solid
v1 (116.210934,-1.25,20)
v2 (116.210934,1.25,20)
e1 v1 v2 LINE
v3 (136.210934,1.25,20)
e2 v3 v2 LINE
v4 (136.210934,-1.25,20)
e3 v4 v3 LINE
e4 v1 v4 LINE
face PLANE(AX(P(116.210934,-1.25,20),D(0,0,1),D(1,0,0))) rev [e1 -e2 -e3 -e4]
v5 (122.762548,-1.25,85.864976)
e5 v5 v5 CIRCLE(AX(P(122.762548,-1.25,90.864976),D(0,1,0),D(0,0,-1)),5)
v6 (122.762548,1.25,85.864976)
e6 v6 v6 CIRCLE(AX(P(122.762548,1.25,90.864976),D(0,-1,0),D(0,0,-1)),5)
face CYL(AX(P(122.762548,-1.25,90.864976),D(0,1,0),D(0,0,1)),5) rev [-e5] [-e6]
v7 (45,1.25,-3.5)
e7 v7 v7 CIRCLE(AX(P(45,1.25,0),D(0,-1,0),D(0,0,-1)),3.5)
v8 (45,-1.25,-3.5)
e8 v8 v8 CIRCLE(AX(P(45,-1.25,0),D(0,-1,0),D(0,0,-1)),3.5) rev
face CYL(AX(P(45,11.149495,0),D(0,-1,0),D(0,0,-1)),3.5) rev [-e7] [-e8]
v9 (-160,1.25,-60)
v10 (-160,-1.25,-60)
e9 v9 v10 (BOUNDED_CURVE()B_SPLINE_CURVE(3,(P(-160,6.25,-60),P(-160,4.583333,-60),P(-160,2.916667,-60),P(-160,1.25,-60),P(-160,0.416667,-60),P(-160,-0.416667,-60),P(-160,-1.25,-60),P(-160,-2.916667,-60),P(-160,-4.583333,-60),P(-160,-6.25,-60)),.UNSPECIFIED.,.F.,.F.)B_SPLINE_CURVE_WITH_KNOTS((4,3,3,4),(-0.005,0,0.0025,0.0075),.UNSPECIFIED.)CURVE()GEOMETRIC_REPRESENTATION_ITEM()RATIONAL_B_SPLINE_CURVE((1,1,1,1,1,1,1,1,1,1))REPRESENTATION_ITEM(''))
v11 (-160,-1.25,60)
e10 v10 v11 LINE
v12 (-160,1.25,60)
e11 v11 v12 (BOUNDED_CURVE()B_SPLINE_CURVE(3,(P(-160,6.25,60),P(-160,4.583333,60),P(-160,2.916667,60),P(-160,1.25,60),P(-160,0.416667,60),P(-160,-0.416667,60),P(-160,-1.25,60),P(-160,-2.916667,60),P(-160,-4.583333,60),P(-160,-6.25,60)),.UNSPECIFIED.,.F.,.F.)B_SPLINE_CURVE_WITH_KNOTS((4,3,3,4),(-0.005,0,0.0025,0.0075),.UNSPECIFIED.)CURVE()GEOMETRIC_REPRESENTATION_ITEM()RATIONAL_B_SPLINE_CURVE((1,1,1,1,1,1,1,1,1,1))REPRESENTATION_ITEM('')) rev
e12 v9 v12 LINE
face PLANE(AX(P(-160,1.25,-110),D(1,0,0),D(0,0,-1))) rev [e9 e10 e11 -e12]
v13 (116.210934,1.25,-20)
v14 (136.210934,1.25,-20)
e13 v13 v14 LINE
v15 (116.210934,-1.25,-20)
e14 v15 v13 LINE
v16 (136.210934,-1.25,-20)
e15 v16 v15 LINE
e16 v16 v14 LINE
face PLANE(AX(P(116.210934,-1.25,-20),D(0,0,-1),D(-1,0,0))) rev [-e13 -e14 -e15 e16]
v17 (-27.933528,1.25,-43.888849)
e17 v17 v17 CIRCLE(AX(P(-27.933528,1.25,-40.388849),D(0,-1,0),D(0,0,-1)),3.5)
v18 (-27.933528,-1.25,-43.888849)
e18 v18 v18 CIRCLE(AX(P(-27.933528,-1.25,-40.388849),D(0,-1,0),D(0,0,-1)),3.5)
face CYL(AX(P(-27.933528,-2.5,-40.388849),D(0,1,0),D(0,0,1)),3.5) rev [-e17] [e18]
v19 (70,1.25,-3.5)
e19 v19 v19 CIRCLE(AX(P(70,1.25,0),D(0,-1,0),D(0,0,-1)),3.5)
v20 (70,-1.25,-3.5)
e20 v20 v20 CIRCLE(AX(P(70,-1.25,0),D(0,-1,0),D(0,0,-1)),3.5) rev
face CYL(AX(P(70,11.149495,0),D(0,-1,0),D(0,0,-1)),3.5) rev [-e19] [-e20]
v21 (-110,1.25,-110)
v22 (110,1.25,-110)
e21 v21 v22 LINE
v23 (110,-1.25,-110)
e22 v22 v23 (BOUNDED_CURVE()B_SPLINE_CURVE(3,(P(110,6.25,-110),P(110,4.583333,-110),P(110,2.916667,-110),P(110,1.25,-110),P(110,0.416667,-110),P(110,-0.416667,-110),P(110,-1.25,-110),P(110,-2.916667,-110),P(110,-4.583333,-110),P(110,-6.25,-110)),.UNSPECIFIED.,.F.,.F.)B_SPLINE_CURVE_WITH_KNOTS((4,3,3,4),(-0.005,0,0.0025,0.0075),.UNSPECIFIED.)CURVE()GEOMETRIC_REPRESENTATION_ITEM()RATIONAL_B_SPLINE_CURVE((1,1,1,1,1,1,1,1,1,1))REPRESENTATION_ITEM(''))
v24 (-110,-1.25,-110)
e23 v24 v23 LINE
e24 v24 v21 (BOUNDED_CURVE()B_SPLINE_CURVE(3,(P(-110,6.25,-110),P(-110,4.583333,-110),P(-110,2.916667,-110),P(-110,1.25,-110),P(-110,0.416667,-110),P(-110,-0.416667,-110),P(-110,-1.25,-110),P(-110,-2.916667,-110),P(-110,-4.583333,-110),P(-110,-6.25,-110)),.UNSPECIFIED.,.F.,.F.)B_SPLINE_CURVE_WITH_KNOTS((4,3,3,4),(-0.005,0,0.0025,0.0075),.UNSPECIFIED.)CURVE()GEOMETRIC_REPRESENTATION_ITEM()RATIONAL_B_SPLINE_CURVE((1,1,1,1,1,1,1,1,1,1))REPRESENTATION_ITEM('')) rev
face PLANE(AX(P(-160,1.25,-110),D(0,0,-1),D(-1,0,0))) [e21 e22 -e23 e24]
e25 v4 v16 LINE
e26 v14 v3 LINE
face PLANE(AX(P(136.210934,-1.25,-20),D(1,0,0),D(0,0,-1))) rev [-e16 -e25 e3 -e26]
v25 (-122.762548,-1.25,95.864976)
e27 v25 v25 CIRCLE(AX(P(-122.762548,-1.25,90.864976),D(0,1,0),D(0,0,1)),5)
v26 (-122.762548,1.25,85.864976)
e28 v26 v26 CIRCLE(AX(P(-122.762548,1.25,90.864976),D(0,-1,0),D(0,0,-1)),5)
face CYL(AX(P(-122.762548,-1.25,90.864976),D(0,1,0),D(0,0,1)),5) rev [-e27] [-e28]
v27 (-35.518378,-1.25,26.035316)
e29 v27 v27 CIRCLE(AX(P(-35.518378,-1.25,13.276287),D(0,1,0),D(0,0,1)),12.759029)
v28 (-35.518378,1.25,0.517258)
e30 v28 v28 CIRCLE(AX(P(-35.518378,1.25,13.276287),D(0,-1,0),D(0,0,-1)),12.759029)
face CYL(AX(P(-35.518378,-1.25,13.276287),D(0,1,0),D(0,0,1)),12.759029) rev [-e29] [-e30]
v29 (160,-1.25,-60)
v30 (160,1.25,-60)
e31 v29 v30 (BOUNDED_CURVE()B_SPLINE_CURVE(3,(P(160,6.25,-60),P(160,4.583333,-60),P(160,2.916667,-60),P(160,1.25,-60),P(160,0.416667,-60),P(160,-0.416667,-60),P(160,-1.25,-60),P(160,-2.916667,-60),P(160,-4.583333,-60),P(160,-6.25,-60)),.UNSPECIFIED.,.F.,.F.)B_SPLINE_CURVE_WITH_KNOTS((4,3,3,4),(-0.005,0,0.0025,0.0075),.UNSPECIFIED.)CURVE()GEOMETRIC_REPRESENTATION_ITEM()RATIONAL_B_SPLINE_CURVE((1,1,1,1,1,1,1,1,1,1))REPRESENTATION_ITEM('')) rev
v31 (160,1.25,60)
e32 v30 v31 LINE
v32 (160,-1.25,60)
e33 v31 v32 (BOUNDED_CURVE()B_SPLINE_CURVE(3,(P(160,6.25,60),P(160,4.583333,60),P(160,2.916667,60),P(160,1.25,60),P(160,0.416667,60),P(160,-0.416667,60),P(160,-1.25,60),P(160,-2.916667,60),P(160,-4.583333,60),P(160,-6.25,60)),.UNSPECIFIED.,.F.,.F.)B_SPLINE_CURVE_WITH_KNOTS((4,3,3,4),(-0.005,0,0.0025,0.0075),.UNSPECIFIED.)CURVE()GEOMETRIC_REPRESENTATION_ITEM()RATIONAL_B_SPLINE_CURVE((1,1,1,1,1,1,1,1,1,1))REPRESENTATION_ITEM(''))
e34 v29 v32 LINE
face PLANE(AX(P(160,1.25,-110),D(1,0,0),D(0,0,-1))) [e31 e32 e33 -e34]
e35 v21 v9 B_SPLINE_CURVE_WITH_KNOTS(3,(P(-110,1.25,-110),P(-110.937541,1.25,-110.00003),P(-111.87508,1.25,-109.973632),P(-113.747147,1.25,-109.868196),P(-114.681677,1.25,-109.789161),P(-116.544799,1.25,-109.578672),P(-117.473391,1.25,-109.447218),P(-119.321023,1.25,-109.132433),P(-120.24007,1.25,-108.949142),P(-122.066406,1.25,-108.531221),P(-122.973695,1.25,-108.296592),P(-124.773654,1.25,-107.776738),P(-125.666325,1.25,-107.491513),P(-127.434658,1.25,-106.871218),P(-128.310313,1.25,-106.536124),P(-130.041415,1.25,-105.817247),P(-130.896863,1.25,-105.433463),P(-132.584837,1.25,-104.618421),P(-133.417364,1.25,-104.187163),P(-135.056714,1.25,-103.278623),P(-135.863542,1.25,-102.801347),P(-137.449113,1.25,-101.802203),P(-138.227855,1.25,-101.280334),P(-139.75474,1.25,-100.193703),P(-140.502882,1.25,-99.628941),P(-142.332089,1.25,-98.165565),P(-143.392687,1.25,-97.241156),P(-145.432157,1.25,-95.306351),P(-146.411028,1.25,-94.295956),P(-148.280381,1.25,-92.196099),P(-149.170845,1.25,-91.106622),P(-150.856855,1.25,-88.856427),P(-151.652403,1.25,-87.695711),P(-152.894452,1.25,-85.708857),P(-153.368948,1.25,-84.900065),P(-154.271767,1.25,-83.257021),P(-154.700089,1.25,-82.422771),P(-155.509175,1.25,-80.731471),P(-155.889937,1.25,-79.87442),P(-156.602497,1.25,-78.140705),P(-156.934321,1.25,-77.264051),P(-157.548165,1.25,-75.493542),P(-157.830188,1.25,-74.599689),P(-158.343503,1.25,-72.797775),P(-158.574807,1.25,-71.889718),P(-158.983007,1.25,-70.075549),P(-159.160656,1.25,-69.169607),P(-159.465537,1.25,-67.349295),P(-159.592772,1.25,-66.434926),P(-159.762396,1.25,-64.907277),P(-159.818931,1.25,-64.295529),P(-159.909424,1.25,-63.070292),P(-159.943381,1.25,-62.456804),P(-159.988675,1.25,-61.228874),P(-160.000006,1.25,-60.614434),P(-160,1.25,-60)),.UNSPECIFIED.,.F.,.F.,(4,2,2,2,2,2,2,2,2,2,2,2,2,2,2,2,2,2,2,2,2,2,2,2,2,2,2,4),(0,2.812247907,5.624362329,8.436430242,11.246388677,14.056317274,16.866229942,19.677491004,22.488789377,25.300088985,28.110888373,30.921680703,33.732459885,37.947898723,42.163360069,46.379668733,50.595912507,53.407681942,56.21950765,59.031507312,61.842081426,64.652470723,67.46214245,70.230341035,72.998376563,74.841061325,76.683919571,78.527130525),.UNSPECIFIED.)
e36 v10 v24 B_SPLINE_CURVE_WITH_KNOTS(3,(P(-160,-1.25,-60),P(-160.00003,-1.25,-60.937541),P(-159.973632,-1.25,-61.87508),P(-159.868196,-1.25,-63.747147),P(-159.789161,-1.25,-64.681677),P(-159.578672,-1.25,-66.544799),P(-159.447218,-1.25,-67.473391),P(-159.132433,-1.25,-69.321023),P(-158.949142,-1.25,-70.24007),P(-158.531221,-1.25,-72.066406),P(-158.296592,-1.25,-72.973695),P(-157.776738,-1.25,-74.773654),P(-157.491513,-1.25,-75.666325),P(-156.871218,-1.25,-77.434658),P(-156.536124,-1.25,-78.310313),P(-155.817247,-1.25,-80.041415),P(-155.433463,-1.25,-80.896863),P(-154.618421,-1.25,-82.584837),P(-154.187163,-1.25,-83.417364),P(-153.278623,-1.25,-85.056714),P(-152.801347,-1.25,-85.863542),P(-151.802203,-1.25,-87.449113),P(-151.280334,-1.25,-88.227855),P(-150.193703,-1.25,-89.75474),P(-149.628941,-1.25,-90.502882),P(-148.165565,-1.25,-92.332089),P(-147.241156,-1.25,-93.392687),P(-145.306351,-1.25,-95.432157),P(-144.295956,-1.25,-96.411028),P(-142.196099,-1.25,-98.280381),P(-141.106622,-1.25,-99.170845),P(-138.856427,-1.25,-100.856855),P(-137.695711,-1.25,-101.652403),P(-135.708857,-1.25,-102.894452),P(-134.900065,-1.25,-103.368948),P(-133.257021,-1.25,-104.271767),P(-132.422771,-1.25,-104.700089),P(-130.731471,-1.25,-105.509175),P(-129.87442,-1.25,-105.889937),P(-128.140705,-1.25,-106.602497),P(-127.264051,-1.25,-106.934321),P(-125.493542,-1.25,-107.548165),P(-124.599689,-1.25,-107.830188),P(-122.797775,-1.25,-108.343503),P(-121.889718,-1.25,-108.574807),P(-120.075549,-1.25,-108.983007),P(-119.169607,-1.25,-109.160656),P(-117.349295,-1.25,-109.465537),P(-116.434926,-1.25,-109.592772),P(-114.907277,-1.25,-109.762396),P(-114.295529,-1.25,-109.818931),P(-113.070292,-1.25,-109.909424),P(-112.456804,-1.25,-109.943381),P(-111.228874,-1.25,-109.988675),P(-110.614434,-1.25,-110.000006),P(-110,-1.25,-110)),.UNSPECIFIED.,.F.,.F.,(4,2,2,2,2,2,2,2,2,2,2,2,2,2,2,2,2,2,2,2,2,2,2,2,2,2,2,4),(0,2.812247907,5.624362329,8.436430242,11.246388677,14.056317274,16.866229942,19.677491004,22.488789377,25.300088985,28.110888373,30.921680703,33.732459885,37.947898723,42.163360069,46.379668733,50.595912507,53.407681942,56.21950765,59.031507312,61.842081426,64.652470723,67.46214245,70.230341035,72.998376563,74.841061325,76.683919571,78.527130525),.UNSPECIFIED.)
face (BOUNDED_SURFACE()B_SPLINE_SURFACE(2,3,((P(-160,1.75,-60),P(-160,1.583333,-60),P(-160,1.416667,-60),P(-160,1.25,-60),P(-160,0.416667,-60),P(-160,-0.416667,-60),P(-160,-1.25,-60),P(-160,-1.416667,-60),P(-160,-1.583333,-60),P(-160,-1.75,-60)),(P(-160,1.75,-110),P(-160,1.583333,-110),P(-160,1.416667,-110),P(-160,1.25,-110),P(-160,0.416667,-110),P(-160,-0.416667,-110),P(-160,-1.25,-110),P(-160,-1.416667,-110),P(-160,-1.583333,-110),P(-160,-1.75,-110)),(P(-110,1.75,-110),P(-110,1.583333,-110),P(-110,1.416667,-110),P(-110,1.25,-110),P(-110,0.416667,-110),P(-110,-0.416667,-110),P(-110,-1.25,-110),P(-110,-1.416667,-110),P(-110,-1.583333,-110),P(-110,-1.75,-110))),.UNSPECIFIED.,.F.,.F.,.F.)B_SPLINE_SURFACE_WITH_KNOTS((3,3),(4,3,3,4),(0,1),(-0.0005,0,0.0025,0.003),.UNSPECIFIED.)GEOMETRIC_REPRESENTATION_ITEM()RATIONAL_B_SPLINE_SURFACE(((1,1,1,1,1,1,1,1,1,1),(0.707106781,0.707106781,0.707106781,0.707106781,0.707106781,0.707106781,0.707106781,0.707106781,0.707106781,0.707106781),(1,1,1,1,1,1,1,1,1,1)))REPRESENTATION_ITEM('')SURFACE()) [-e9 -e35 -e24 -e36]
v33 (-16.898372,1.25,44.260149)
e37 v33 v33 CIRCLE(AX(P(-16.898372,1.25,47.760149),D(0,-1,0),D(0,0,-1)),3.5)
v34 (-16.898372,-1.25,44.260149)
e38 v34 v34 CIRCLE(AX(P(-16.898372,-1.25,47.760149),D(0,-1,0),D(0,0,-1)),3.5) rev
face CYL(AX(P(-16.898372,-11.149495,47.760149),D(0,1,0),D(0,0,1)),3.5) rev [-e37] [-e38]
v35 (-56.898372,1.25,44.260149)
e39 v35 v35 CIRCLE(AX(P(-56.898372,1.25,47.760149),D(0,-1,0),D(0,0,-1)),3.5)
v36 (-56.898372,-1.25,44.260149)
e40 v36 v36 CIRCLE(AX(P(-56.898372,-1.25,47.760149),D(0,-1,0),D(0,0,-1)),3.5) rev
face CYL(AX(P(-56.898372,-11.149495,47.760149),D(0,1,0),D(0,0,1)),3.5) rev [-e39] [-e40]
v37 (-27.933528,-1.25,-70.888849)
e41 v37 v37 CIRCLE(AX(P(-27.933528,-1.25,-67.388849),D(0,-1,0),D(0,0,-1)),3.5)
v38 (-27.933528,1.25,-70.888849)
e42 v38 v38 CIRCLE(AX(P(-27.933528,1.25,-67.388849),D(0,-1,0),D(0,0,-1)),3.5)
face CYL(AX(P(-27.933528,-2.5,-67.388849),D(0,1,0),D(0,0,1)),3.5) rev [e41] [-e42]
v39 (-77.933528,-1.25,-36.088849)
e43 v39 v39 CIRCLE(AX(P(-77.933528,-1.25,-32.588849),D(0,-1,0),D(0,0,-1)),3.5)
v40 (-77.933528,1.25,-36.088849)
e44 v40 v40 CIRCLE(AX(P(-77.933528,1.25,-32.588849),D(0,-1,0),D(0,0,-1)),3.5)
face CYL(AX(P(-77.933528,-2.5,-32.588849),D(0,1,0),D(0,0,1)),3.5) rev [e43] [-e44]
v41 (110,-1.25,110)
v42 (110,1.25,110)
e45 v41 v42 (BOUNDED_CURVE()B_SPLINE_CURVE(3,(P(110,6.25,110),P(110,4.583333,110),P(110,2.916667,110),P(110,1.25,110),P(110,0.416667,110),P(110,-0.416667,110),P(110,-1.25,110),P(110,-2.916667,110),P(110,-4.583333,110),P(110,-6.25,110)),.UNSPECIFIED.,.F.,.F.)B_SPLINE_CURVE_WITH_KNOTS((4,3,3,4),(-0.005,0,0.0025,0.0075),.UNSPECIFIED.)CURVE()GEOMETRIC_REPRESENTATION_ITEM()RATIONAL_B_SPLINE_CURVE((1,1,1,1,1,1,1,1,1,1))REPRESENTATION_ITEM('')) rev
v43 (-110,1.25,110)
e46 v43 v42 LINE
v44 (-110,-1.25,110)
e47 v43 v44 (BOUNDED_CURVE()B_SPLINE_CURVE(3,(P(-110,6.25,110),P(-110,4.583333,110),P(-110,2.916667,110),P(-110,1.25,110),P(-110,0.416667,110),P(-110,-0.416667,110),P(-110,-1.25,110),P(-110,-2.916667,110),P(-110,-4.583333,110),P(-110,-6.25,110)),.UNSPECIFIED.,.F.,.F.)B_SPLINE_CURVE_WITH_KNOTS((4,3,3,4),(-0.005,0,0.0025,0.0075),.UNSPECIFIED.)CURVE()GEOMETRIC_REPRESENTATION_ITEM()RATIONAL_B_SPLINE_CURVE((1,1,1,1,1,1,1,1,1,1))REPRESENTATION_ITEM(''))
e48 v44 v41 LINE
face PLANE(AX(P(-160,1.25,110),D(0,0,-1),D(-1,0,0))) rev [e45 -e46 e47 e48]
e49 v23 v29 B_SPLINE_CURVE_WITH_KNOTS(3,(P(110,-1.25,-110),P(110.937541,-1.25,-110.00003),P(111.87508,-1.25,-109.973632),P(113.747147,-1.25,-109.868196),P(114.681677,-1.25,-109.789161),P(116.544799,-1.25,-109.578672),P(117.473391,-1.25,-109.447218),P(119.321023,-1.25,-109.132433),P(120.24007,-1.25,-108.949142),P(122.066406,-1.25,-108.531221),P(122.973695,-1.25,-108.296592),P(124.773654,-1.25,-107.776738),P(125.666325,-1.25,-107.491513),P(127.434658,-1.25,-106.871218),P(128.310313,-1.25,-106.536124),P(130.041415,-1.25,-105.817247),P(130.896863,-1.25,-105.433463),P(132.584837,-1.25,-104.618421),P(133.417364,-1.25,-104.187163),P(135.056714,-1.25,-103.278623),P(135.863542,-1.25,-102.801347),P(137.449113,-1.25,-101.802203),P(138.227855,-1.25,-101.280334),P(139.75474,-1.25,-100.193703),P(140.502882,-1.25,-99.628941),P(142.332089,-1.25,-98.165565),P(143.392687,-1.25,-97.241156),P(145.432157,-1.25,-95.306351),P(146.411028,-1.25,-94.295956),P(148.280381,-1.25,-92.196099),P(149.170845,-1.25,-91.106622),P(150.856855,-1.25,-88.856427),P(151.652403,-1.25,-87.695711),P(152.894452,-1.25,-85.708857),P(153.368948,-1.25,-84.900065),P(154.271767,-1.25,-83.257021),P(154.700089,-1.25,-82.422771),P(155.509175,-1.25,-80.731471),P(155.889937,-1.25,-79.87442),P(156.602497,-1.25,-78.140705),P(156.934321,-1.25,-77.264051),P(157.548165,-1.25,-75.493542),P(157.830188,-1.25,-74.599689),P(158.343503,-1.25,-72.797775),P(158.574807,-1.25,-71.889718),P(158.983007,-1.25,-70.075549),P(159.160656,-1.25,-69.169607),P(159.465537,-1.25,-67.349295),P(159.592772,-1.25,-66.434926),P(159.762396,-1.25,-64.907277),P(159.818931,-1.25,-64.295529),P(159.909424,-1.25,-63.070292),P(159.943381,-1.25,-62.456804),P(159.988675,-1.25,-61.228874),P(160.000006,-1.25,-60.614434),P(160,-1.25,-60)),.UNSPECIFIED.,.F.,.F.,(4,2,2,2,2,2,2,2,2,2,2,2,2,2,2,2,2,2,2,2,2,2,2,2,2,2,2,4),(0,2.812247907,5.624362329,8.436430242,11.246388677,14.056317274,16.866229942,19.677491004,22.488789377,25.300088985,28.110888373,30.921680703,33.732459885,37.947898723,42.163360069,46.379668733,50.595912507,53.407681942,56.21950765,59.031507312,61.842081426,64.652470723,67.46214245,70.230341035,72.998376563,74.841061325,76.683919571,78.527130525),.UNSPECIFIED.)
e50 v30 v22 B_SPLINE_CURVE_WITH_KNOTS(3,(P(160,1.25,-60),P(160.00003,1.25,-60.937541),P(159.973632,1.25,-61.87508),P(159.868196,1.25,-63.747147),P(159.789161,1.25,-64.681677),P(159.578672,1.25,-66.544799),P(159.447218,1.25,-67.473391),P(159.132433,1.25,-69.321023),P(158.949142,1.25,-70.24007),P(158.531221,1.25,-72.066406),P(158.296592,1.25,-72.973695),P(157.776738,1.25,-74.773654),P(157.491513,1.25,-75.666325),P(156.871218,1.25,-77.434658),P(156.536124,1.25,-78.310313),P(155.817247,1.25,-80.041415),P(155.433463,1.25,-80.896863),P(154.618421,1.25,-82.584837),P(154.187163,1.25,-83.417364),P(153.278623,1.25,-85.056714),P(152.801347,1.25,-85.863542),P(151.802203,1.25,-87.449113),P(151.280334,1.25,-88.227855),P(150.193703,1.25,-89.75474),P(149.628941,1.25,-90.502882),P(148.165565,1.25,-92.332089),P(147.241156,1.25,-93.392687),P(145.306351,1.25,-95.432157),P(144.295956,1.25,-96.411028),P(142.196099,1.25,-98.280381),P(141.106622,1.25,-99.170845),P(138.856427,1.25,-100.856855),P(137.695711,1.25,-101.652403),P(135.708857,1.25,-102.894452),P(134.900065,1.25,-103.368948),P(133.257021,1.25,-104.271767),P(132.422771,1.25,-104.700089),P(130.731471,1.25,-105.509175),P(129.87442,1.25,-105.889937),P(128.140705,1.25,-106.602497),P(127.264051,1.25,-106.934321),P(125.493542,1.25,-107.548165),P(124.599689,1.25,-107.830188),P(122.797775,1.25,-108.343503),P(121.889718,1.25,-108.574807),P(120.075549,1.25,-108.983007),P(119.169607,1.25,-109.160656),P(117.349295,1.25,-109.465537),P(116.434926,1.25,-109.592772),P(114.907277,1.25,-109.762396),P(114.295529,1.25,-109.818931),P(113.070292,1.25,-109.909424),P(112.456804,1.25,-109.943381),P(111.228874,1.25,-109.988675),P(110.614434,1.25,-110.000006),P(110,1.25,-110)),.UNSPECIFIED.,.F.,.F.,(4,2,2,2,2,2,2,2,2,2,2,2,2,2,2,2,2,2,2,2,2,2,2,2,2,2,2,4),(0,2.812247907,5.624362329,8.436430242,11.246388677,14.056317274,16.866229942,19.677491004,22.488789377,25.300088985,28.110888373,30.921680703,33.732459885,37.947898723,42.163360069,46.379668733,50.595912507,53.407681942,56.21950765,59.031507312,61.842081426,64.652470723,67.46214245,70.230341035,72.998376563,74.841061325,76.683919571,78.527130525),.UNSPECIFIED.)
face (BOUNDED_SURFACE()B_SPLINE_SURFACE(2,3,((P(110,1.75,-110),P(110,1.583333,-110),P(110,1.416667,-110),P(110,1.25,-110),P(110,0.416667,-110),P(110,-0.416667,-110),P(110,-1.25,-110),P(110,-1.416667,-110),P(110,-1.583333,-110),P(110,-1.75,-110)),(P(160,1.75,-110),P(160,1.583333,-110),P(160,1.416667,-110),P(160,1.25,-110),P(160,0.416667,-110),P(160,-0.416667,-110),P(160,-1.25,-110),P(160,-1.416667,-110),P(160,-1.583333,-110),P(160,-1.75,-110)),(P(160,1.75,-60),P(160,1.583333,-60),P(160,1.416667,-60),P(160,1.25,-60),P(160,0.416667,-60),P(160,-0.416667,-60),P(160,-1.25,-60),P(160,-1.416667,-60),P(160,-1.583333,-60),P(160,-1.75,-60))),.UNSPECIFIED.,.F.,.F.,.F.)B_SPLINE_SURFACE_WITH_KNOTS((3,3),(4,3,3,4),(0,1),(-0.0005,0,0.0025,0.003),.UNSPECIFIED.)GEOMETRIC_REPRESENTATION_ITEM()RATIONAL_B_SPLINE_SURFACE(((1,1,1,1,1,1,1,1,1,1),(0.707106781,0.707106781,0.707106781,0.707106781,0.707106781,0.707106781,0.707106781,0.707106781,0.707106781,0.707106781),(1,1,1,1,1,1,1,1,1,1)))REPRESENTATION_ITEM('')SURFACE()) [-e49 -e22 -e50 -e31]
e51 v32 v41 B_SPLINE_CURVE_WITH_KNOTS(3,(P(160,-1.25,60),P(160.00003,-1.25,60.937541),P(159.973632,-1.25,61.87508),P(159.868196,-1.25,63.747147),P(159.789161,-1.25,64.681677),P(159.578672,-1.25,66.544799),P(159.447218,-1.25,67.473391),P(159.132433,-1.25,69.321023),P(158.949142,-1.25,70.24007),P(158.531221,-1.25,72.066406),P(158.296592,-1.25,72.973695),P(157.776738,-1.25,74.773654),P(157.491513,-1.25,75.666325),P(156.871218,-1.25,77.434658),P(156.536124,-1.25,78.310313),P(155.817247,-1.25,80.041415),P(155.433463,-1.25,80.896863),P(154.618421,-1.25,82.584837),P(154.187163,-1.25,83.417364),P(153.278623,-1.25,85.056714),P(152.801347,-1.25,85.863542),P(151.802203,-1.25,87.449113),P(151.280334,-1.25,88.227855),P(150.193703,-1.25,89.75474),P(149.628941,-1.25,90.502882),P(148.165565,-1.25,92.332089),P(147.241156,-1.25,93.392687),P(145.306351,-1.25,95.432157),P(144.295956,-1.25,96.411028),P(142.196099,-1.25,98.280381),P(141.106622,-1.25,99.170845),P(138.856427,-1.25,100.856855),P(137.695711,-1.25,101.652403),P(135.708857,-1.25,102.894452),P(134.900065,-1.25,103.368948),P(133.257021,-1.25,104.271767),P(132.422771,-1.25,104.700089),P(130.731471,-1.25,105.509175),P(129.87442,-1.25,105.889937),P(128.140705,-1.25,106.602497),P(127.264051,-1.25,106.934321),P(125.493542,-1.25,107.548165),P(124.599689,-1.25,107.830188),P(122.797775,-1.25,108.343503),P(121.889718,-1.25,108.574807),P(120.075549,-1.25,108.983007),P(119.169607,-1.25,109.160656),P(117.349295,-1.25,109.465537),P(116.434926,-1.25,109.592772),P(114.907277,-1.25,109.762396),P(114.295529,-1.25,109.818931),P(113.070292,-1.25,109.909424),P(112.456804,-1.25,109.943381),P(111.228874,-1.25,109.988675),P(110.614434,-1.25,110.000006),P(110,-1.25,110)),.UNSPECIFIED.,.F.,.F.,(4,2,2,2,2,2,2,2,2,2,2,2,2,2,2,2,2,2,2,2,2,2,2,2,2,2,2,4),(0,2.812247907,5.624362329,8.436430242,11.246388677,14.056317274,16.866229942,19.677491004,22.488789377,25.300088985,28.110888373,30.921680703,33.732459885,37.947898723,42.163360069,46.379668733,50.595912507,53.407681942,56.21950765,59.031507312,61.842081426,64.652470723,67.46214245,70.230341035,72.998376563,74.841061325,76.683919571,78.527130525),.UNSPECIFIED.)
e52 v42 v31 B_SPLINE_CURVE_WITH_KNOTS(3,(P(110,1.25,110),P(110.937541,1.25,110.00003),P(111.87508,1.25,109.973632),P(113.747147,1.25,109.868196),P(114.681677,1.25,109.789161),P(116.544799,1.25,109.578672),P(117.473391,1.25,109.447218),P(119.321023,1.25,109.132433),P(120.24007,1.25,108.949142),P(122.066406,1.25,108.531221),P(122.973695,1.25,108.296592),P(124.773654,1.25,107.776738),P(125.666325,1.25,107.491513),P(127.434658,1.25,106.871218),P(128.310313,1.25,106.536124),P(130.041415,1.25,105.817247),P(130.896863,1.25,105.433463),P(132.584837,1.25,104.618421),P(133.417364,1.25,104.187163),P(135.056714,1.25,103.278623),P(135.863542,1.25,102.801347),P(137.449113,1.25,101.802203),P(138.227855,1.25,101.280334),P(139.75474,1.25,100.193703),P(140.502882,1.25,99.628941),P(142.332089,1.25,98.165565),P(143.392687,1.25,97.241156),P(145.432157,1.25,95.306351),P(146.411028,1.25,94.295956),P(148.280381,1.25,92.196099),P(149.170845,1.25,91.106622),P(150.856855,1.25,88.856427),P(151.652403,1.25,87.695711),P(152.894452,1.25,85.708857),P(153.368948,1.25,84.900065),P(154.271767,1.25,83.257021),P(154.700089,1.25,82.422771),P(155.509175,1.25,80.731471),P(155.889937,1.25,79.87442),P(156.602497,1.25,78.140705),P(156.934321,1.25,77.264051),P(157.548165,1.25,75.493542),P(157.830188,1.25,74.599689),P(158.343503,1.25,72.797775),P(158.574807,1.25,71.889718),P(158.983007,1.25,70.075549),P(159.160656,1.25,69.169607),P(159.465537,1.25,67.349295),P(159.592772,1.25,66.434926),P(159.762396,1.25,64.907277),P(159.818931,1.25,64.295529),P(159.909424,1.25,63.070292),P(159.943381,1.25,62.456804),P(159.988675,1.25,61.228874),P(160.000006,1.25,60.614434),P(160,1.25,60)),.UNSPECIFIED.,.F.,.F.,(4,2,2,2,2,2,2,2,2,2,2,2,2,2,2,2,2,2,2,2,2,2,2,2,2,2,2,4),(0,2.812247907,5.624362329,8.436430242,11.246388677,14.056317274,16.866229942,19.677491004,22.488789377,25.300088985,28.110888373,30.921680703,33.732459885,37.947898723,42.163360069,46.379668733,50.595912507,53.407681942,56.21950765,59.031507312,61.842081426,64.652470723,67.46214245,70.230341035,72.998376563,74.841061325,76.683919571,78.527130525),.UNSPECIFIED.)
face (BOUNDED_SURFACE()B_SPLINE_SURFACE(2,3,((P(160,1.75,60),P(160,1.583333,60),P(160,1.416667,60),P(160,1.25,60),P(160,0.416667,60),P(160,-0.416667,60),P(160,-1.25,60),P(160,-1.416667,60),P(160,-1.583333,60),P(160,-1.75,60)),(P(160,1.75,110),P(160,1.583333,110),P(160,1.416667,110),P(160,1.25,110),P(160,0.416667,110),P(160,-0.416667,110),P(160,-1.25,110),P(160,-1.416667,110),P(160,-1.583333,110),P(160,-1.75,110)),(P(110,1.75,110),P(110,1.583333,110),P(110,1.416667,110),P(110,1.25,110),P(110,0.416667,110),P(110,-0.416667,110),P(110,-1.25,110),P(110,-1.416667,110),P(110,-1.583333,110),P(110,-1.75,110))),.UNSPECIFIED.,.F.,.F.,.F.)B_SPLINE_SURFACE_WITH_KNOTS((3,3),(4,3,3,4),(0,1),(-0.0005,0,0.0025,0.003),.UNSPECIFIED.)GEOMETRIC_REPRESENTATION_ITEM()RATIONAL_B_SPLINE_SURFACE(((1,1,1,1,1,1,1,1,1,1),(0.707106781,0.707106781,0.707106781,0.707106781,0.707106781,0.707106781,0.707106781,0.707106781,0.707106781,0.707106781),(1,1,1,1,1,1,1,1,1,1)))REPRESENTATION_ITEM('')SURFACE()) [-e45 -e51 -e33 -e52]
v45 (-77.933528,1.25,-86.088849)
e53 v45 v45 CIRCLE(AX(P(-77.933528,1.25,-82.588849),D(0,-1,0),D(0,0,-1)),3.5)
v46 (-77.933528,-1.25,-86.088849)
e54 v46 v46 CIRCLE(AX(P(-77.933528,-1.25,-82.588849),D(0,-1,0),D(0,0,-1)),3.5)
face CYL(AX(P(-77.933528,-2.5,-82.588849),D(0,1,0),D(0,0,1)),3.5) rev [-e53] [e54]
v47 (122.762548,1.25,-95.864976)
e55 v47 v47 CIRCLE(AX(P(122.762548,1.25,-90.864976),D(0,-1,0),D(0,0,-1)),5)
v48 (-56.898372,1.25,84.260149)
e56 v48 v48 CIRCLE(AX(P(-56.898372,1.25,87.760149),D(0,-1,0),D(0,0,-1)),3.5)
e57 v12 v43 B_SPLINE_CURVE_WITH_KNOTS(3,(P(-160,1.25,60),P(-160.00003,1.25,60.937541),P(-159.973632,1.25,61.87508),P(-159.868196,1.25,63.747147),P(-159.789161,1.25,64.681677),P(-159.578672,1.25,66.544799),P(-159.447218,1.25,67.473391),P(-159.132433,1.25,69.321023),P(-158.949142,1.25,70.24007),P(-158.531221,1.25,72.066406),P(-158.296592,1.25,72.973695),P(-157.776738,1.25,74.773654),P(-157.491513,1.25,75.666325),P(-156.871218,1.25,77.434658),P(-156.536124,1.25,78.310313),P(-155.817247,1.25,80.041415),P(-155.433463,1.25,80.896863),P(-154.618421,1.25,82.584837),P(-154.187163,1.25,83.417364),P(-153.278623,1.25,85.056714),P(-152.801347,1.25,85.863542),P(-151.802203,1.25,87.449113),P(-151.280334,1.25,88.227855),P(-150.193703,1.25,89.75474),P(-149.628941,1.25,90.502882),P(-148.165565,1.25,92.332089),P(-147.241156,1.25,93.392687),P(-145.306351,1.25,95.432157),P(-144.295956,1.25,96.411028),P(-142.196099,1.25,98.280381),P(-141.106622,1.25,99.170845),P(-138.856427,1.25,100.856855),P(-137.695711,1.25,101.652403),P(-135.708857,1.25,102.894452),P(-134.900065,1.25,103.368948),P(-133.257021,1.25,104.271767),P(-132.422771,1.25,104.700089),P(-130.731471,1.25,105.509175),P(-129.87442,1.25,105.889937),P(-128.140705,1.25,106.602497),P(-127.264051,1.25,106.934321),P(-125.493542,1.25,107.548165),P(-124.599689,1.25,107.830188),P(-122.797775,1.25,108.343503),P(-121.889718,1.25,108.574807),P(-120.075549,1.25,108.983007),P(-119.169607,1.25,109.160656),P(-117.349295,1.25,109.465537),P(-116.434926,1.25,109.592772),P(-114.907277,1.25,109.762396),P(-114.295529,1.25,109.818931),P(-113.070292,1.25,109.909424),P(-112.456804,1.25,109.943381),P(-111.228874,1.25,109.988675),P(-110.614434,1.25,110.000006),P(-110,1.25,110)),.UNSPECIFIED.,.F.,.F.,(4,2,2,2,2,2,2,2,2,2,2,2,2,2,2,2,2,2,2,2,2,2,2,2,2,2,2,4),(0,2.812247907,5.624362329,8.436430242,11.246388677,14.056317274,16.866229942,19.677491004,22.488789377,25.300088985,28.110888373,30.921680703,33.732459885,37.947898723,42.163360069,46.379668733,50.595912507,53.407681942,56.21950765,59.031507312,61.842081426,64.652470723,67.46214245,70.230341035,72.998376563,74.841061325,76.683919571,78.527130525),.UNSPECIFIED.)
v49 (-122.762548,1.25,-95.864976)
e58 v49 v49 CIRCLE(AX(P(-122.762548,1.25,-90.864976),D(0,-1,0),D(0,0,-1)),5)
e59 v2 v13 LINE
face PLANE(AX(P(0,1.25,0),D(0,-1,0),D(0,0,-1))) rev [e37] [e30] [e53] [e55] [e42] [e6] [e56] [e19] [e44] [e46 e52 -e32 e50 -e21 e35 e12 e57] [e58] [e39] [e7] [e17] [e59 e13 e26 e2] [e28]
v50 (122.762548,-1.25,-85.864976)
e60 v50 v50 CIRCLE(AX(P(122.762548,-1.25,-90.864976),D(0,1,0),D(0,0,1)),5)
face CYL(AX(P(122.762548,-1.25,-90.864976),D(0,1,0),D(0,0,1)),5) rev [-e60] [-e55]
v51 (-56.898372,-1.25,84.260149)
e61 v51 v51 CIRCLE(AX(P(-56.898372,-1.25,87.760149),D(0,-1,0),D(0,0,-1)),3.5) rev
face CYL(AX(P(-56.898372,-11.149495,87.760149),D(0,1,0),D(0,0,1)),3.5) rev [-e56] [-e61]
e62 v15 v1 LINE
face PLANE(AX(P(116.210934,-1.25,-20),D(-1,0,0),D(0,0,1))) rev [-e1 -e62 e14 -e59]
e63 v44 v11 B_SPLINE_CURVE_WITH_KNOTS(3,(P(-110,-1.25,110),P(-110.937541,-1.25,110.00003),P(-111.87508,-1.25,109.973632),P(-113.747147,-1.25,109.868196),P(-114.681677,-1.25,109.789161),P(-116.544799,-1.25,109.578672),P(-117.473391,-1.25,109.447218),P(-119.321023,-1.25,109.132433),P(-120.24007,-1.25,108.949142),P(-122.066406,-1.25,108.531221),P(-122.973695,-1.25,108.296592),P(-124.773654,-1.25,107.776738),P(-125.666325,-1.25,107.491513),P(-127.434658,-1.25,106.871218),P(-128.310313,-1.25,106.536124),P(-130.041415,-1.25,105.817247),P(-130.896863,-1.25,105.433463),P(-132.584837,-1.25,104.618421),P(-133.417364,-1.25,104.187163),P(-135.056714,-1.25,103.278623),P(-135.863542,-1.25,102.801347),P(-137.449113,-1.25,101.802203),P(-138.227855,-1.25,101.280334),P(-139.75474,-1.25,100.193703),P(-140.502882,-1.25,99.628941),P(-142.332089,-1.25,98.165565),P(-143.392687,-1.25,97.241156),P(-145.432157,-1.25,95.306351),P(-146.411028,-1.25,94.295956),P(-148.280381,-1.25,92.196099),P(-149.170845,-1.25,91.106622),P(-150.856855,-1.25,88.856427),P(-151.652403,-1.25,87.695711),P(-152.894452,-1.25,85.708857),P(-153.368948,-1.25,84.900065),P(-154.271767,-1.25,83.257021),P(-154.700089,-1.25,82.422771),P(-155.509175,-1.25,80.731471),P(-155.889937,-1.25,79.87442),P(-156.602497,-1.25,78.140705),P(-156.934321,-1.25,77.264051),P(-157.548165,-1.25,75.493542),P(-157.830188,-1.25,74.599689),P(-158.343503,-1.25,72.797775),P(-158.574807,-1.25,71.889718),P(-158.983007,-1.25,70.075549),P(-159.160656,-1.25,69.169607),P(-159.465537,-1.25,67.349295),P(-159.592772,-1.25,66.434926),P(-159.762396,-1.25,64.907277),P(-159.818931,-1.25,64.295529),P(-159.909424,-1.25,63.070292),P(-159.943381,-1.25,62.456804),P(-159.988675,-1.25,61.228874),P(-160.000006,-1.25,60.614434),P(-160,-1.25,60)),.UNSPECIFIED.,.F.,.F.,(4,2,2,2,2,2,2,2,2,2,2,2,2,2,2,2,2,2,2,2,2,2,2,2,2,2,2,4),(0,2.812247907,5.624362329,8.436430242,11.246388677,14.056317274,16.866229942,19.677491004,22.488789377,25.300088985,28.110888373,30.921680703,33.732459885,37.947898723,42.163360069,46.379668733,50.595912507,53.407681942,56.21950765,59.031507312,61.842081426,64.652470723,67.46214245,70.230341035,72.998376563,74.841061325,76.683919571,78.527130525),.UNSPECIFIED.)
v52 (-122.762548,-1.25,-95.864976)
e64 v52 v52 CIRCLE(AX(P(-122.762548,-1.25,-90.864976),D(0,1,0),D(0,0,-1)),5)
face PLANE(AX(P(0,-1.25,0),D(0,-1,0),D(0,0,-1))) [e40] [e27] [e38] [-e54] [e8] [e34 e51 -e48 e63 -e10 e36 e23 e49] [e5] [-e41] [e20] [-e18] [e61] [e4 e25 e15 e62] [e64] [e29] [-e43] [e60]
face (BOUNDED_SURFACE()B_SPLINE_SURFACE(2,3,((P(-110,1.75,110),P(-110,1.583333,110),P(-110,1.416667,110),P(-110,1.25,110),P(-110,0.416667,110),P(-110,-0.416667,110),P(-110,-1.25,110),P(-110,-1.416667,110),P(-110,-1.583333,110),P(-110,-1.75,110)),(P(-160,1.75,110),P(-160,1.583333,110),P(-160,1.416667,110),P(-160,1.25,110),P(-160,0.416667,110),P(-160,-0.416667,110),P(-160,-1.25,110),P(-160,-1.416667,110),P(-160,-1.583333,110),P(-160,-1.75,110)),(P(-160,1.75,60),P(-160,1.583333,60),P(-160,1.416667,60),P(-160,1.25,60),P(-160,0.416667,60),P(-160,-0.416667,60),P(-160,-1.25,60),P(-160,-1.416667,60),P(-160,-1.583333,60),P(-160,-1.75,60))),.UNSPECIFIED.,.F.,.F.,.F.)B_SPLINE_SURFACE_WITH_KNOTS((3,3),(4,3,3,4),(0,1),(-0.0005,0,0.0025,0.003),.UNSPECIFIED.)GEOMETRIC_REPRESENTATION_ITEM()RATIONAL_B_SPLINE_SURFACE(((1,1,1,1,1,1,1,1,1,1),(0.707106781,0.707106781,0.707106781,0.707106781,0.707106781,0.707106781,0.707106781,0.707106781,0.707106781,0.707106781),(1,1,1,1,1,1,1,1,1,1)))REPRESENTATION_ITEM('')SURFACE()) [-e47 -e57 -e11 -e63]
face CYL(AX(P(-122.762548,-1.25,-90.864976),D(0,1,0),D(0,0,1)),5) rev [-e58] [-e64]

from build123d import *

# Parameters (mm, degrees)
SKETCH1_W                       = 320
SKETCH1_H                       = 220
THE_UPPER_CHASISS_DEPTH         = 1.25
BATTARY_REACH                   = 196.169
SKETCH2_R                       = 3.5
BATTARY_DIRECTION_2_REACH       = 196.169
POWER_SECTION_REACH             = 196.169
SKETCH3_R                       = 3.5
POWER_SECTION_DIRECTION_2_REACH = 196.169
ARDUINO_R                       = 3.5
ARDUINO_SECTION_DEPTH           = 2.5
SKETCH7_R                       = 5
LINK_NAILS_DEPTH                = 2.5
SKETCH9_W                       = 20
SKETCH9_H                       = 40
RECT_CUT_DEPTH                  = 2.5
SKETCH10_R                      = 12.759028862
CIRC_CUT_DEPTH                  = 2.5
FILLET4_R                       = 50


with BuildPart() as part:
    # Sketch1 → the upper chasiss (new, symmetric)
    with BuildSketch(Plane(origin=(0, 0, 0), x_dir=(1, 0, 0), z_dir=(0, 1, 0))):
        Rectangle(SKETCH1_W, SKETCH1_H)
    extrude(amount=THE_UPPER_CHASISS_DEPTH, both=True)

    # Battary: up to this face of the body (flat: up to its plane)
    battary_end = Plane(part.part.faces().sort_by_distance((0, 1.25, 0))[0])
    # Sketch2 → Battary (cut, up to the picked face)
    with BuildSketch(Plane(origin=(0, 0, 0), x_dir=(1, 0, 0), z_dir=(0, 1, 0)), mode=Mode.PRIVATE) as battary_sk1:
        with Locations((70, 0)):
            Circle(SKETCH2_R)
    battary_tool1 = split(extrude(battary_sk1.sketch, amount=BATTARY_REACH, mode=Mode.PRIVATE), bisect_by=battary_end, keep=Keep.BOTH, mode=Mode.PRIVATE)
    # Sketch2 → Battary (cut, up to the picked face)
    with BuildSketch(Plane(origin=(0, 0, 0), x_dir=(1, 0, 0), z_dir=(0, 1, 0)), mode=Mode.PRIVATE) as battary_sk2:
        with Locations((45, 0)):
            Circle(SKETCH2_R)
    battary_tool2 = split(extrude(battary_sk2.sketch, amount=BATTARY_REACH, mode=Mode.PRIVATE), bisect_by=battary_end, keep=Keep.BOTH, mode=Mode.PRIVATE)
    add(battary_tool1.solids().sort_by(Axis((70, 0, 0), (0, 1, 0)))[0], mode=Mode.SUBTRACT)
    add(battary_tool2.solids().sort_by(Axis((45, 0, 0), (0, 1, 0)))[0], mode=Mode.SUBTRACT)

    # Battary direction 2: up to this face of the body (flat: up to its plane)
    battary_direction_2_end = Plane(part.part.faces().sort_by_distance((0, -1.25, 0))[0])
    # Sketch2 → Battary direction 2 (cut, up to the picked face)
    with BuildSketch(Plane(origin=(0, 0, 0), x_dir=(1, 0, 0), z_dir=(0, 1, 0)), mode=Mode.PRIVATE) as battary_direction_2_sk1:
        with Locations((70, 0)):
            Circle(SKETCH2_R)
    battary_direction_2_tool1 = split(extrude(battary_direction_2_sk1.sketch, amount=-BATTARY_DIRECTION_2_REACH, mode=Mode.PRIVATE), bisect_by=battary_direction_2_end, keep=Keep.BOTH, mode=Mode.PRIVATE)
    # Sketch2 → Battary direction 2 (cut, up to the picked face)
    with BuildSketch(Plane(origin=(0, 0, 0), x_dir=(1, 0, 0), z_dir=(0, 1, 0)), mode=Mode.PRIVATE) as battary_direction_2_sk2:
        with Locations((45, 0)):
            Circle(SKETCH2_R)
    battary_direction_2_tool2 = split(extrude(battary_direction_2_sk2.sketch, amount=-BATTARY_DIRECTION_2_REACH, mode=Mode.PRIVATE), bisect_by=battary_direction_2_end, keep=Keep.BOTH, mode=Mode.PRIVATE)
    add(battary_direction_2_tool1.solids().sort_by(Axis((70, 0, 0), (0, -1, 0)))[0], mode=Mode.SUBTRACT)
    add(battary_direction_2_tool2.solids().sort_by(Axis((45, 0, 0), (0, -1, 0)))[0], mode=Mode.SUBTRACT)

    # power section: up to this face of the body (flat: up to its plane)
    power_section_end = Plane(part.part.faces().sort_by_distance((-0.062934128, -1.25, 0))[0])
    # Sketch3 → power section (cut, up to the picked face)
    with BuildSketch(Plane(origin=(0, 0, 0), x_dir=(1, 0, 0), z_dir=(0, 1, 0)), mode=Mode.PRIVATE) as power_section_sk1:
        with Locations((-56.898371951, -47.760148577)):
            Circle(SKETCH3_R)
    power_section_tool1 = split(extrude(power_section_sk1.sketch, amount=-POWER_SECTION_REACH, mode=Mode.PRIVATE), bisect_by=power_section_end, keep=Keep.BOTH, mode=Mode.PRIVATE)
    # Sketch3 → power section (cut, up to the picked face)
    with BuildSketch(Plane(origin=(0, 0, 0), x_dir=(1, 0, 0), z_dir=(0, 1, 0)), mode=Mode.PRIVATE) as power_section_sk2:
        with Locations((-16.898371951, -47.760148577)):
            Circle(SKETCH3_R)
    power_section_tool2 = split(extrude(power_section_sk2.sketch, amount=-POWER_SECTION_REACH, mode=Mode.PRIVATE), bisect_by=power_section_end, keep=Keep.BOTH, mode=Mode.PRIVATE)
    # Sketch3 → power section (cut, up to the picked face)
    with BuildSketch(Plane(origin=(0, 0, 0), x_dir=(1, 0, 0), z_dir=(0, 1, 0)), mode=Mode.PRIVATE) as power_section_sk3:
        with Locations((-56.898371951, -87.760148577)):
            Circle(SKETCH3_R)
    power_section_tool3 = split(extrude(power_section_sk3.sketch, amount=-POWER_SECTION_REACH, mode=Mode.PRIVATE), bisect_by=power_section_end, keep=Keep.BOTH, mode=Mode.PRIVATE)
    add(power_section_tool1.solids().sort_by(Axis((-56.898372, 0, 47.760149), (0, -1, 0)))[0], mode=Mode.SUBTRACT)
    add(power_section_tool2.solids().sort_by(Axis((-16.898372, 0, 47.760149), (0, -1, 0)))[0], mode=Mode.SUBTRACT)
    add(power_section_tool3.solids().sort_by(Axis((-56.898372, 0, 87.760149), (0, -1, 0)))[0], mode=Mode.SUBTRACT)

    # power section direction 2: up to this face of the body (flat: up to its plane)
    power_section_direction_2_end = Plane(part.part.faces().sort_by_distance((-0.062934128, 1.25, 0))[0])
    # Sketch3 → power section direction 2 (cut, up to the picked face)
    with BuildSketch(Plane(origin=(0, 0, 0), x_dir=(1, 0, 0), z_dir=(0, 1, 0)), mode=Mode.PRIVATE) as power_section_direction_2_sk1:
        with Locations((-56.898371951, -47.760148577)):
            Circle(SKETCH3_R)
    power_section_direction_2_tool1 = split(extrude(power_section_direction_2_sk1.sketch, amount=POWER_SECTION_DIRECTION_2_REACH, mode=Mode.PRIVATE), bisect_by=power_section_direction_2_end, keep=Keep.BOTH, mode=Mode.PRIVATE)
    # Sketch3 → power section direction 2 (cut, up to the picked face)
    with BuildSketch(Plane(origin=(0, 0, 0), x_dir=(1, 0, 0), z_dir=(0, 1, 0)), mode=Mode.PRIVATE) as power_section_direction_2_sk2:
        with Locations((-16.898371951, -47.760148577)):
            Circle(SKETCH3_R)
    power_section_direction_2_tool2 = split(extrude(power_section_direction_2_sk2.sketch, amount=POWER_SECTION_DIRECTION_2_REACH, mode=Mode.PRIVATE), bisect_by=power_section_direction_2_end, keep=Keep.BOTH, mode=Mode.PRIVATE)
    # Sketch3 → power section direction 2 (cut, up to the picked face)
    with BuildSketch(Plane(origin=(0, 0, 0), x_dir=(1, 0, 0), z_dir=(0, 1, 0)), mode=Mode.PRIVATE) as power_section_direction_2_sk3:
        with Locations((-56.898371951, -87.760148577)):
            Circle(SKETCH3_R)
    power_section_direction_2_tool3 = split(extrude(power_section_direction_2_sk3.sketch, amount=POWER_SECTION_DIRECTION_2_REACH, mode=Mode.PRIVATE), bisect_by=power_section_direction_2_end, keep=Keep.BOTH, mode=Mode.PRIVATE)
    add(power_section_direction_2_tool1.solids().sort_by(Axis((-56.898372, 0, 47.760149), (0, 1, 0)))[0], mode=Mode.SUBTRACT)
    add(power_section_direction_2_tool2.solids().sort_by(Axis((-16.898372, 0, 47.760149), (0, 1, 0)))[0], mode=Mode.SUBTRACT)
    add(power_section_direction_2_tool3.solids().sort_by(Axis((-56.898372, 0, 87.760149), (0, 1, 0)))[0], mode=Mode.SUBTRACT)

    # arduino → arduino section (cut, symmetric)
    with BuildSketch(Plane(origin=(0, 0, 0), x_dir=(1, 0, 0), z_dir=(0, 1, 0))):
        with Locations((-77.933527642, 82.588848983)):
            Circle(ARDUINO_R)
        with Locations((-77.933527642, 32.588848983)):
            Circle(ARDUINO_R)
        with Locations((-27.933527642, 67.388848983)):
            Circle(ARDUINO_R)
        with Locations((-27.933527642, 40.388848983)):
            Circle(ARDUINO_R)
    extrude(amount=ARDUINO_SECTION_DEPTH, both=True, mode=Mode.SUBTRACT)

    # Sketch7 → link nails (cut, symmetric)
    with BuildSketch(Plane(origin=(0, 1.25, 0), x_dir=(1, 0, 0), z_dir=(0, 1, 0))):
        with Locations((-122.762547967, -90.864975812)):
            Circle(SKETCH7_R)
        with Locations((-122.762547967, 90.864975812)):
            Circle(SKETCH7_R)
        with Locations((122.762547967, -90.864975812)):
            Circle(SKETCH7_R)
        with Locations((122.762547967, 90.864975812)):
            Circle(SKETCH7_R)
    extrude(amount=LINK_NAILS_DEPTH, both=True, mode=Mode.SUBTRACT)

    # Sketch9 → rect cut (cut, symmetric)
    with BuildSketch(Plane(origin=(0, 1.25, 0), x_dir=(1, 0, 0), z_dir=(0, 1, 0))):
        with Locations((126.210934146, 0)):
            Rectangle(SKETCH9_W, SKETCH9_H)
    extrude(amount=RECT_CUT_DEPTH, both=True, mode=Mode.SUBTRACT)

    # Sketch10 → circ cut (cut, symmetric)
    with BuildSketch(Plane(origin=(0, 1.25, 0), x_dir=(1, 0, 0), z_dir=(0, 1, 0))):
        with Locations((-35.518377642, -13.276286789)):
            Circle(SKETCH10_R)
    extrude(amount=CIRC_CUT_DEPTH, both=True, mode=Mode.SUBTRACT)

    # Fillet4
    fillet4_edges = [part.edges().sort_by_distance(p)[0] for p in [
        (-160, 0, 110),
        (160, 0, 110),
        (160, 0, -110),
        (-160, 0, -110),
    ]]
    fillet(fillet4_edges, radius=FILLET4_R)


solid = part.part
